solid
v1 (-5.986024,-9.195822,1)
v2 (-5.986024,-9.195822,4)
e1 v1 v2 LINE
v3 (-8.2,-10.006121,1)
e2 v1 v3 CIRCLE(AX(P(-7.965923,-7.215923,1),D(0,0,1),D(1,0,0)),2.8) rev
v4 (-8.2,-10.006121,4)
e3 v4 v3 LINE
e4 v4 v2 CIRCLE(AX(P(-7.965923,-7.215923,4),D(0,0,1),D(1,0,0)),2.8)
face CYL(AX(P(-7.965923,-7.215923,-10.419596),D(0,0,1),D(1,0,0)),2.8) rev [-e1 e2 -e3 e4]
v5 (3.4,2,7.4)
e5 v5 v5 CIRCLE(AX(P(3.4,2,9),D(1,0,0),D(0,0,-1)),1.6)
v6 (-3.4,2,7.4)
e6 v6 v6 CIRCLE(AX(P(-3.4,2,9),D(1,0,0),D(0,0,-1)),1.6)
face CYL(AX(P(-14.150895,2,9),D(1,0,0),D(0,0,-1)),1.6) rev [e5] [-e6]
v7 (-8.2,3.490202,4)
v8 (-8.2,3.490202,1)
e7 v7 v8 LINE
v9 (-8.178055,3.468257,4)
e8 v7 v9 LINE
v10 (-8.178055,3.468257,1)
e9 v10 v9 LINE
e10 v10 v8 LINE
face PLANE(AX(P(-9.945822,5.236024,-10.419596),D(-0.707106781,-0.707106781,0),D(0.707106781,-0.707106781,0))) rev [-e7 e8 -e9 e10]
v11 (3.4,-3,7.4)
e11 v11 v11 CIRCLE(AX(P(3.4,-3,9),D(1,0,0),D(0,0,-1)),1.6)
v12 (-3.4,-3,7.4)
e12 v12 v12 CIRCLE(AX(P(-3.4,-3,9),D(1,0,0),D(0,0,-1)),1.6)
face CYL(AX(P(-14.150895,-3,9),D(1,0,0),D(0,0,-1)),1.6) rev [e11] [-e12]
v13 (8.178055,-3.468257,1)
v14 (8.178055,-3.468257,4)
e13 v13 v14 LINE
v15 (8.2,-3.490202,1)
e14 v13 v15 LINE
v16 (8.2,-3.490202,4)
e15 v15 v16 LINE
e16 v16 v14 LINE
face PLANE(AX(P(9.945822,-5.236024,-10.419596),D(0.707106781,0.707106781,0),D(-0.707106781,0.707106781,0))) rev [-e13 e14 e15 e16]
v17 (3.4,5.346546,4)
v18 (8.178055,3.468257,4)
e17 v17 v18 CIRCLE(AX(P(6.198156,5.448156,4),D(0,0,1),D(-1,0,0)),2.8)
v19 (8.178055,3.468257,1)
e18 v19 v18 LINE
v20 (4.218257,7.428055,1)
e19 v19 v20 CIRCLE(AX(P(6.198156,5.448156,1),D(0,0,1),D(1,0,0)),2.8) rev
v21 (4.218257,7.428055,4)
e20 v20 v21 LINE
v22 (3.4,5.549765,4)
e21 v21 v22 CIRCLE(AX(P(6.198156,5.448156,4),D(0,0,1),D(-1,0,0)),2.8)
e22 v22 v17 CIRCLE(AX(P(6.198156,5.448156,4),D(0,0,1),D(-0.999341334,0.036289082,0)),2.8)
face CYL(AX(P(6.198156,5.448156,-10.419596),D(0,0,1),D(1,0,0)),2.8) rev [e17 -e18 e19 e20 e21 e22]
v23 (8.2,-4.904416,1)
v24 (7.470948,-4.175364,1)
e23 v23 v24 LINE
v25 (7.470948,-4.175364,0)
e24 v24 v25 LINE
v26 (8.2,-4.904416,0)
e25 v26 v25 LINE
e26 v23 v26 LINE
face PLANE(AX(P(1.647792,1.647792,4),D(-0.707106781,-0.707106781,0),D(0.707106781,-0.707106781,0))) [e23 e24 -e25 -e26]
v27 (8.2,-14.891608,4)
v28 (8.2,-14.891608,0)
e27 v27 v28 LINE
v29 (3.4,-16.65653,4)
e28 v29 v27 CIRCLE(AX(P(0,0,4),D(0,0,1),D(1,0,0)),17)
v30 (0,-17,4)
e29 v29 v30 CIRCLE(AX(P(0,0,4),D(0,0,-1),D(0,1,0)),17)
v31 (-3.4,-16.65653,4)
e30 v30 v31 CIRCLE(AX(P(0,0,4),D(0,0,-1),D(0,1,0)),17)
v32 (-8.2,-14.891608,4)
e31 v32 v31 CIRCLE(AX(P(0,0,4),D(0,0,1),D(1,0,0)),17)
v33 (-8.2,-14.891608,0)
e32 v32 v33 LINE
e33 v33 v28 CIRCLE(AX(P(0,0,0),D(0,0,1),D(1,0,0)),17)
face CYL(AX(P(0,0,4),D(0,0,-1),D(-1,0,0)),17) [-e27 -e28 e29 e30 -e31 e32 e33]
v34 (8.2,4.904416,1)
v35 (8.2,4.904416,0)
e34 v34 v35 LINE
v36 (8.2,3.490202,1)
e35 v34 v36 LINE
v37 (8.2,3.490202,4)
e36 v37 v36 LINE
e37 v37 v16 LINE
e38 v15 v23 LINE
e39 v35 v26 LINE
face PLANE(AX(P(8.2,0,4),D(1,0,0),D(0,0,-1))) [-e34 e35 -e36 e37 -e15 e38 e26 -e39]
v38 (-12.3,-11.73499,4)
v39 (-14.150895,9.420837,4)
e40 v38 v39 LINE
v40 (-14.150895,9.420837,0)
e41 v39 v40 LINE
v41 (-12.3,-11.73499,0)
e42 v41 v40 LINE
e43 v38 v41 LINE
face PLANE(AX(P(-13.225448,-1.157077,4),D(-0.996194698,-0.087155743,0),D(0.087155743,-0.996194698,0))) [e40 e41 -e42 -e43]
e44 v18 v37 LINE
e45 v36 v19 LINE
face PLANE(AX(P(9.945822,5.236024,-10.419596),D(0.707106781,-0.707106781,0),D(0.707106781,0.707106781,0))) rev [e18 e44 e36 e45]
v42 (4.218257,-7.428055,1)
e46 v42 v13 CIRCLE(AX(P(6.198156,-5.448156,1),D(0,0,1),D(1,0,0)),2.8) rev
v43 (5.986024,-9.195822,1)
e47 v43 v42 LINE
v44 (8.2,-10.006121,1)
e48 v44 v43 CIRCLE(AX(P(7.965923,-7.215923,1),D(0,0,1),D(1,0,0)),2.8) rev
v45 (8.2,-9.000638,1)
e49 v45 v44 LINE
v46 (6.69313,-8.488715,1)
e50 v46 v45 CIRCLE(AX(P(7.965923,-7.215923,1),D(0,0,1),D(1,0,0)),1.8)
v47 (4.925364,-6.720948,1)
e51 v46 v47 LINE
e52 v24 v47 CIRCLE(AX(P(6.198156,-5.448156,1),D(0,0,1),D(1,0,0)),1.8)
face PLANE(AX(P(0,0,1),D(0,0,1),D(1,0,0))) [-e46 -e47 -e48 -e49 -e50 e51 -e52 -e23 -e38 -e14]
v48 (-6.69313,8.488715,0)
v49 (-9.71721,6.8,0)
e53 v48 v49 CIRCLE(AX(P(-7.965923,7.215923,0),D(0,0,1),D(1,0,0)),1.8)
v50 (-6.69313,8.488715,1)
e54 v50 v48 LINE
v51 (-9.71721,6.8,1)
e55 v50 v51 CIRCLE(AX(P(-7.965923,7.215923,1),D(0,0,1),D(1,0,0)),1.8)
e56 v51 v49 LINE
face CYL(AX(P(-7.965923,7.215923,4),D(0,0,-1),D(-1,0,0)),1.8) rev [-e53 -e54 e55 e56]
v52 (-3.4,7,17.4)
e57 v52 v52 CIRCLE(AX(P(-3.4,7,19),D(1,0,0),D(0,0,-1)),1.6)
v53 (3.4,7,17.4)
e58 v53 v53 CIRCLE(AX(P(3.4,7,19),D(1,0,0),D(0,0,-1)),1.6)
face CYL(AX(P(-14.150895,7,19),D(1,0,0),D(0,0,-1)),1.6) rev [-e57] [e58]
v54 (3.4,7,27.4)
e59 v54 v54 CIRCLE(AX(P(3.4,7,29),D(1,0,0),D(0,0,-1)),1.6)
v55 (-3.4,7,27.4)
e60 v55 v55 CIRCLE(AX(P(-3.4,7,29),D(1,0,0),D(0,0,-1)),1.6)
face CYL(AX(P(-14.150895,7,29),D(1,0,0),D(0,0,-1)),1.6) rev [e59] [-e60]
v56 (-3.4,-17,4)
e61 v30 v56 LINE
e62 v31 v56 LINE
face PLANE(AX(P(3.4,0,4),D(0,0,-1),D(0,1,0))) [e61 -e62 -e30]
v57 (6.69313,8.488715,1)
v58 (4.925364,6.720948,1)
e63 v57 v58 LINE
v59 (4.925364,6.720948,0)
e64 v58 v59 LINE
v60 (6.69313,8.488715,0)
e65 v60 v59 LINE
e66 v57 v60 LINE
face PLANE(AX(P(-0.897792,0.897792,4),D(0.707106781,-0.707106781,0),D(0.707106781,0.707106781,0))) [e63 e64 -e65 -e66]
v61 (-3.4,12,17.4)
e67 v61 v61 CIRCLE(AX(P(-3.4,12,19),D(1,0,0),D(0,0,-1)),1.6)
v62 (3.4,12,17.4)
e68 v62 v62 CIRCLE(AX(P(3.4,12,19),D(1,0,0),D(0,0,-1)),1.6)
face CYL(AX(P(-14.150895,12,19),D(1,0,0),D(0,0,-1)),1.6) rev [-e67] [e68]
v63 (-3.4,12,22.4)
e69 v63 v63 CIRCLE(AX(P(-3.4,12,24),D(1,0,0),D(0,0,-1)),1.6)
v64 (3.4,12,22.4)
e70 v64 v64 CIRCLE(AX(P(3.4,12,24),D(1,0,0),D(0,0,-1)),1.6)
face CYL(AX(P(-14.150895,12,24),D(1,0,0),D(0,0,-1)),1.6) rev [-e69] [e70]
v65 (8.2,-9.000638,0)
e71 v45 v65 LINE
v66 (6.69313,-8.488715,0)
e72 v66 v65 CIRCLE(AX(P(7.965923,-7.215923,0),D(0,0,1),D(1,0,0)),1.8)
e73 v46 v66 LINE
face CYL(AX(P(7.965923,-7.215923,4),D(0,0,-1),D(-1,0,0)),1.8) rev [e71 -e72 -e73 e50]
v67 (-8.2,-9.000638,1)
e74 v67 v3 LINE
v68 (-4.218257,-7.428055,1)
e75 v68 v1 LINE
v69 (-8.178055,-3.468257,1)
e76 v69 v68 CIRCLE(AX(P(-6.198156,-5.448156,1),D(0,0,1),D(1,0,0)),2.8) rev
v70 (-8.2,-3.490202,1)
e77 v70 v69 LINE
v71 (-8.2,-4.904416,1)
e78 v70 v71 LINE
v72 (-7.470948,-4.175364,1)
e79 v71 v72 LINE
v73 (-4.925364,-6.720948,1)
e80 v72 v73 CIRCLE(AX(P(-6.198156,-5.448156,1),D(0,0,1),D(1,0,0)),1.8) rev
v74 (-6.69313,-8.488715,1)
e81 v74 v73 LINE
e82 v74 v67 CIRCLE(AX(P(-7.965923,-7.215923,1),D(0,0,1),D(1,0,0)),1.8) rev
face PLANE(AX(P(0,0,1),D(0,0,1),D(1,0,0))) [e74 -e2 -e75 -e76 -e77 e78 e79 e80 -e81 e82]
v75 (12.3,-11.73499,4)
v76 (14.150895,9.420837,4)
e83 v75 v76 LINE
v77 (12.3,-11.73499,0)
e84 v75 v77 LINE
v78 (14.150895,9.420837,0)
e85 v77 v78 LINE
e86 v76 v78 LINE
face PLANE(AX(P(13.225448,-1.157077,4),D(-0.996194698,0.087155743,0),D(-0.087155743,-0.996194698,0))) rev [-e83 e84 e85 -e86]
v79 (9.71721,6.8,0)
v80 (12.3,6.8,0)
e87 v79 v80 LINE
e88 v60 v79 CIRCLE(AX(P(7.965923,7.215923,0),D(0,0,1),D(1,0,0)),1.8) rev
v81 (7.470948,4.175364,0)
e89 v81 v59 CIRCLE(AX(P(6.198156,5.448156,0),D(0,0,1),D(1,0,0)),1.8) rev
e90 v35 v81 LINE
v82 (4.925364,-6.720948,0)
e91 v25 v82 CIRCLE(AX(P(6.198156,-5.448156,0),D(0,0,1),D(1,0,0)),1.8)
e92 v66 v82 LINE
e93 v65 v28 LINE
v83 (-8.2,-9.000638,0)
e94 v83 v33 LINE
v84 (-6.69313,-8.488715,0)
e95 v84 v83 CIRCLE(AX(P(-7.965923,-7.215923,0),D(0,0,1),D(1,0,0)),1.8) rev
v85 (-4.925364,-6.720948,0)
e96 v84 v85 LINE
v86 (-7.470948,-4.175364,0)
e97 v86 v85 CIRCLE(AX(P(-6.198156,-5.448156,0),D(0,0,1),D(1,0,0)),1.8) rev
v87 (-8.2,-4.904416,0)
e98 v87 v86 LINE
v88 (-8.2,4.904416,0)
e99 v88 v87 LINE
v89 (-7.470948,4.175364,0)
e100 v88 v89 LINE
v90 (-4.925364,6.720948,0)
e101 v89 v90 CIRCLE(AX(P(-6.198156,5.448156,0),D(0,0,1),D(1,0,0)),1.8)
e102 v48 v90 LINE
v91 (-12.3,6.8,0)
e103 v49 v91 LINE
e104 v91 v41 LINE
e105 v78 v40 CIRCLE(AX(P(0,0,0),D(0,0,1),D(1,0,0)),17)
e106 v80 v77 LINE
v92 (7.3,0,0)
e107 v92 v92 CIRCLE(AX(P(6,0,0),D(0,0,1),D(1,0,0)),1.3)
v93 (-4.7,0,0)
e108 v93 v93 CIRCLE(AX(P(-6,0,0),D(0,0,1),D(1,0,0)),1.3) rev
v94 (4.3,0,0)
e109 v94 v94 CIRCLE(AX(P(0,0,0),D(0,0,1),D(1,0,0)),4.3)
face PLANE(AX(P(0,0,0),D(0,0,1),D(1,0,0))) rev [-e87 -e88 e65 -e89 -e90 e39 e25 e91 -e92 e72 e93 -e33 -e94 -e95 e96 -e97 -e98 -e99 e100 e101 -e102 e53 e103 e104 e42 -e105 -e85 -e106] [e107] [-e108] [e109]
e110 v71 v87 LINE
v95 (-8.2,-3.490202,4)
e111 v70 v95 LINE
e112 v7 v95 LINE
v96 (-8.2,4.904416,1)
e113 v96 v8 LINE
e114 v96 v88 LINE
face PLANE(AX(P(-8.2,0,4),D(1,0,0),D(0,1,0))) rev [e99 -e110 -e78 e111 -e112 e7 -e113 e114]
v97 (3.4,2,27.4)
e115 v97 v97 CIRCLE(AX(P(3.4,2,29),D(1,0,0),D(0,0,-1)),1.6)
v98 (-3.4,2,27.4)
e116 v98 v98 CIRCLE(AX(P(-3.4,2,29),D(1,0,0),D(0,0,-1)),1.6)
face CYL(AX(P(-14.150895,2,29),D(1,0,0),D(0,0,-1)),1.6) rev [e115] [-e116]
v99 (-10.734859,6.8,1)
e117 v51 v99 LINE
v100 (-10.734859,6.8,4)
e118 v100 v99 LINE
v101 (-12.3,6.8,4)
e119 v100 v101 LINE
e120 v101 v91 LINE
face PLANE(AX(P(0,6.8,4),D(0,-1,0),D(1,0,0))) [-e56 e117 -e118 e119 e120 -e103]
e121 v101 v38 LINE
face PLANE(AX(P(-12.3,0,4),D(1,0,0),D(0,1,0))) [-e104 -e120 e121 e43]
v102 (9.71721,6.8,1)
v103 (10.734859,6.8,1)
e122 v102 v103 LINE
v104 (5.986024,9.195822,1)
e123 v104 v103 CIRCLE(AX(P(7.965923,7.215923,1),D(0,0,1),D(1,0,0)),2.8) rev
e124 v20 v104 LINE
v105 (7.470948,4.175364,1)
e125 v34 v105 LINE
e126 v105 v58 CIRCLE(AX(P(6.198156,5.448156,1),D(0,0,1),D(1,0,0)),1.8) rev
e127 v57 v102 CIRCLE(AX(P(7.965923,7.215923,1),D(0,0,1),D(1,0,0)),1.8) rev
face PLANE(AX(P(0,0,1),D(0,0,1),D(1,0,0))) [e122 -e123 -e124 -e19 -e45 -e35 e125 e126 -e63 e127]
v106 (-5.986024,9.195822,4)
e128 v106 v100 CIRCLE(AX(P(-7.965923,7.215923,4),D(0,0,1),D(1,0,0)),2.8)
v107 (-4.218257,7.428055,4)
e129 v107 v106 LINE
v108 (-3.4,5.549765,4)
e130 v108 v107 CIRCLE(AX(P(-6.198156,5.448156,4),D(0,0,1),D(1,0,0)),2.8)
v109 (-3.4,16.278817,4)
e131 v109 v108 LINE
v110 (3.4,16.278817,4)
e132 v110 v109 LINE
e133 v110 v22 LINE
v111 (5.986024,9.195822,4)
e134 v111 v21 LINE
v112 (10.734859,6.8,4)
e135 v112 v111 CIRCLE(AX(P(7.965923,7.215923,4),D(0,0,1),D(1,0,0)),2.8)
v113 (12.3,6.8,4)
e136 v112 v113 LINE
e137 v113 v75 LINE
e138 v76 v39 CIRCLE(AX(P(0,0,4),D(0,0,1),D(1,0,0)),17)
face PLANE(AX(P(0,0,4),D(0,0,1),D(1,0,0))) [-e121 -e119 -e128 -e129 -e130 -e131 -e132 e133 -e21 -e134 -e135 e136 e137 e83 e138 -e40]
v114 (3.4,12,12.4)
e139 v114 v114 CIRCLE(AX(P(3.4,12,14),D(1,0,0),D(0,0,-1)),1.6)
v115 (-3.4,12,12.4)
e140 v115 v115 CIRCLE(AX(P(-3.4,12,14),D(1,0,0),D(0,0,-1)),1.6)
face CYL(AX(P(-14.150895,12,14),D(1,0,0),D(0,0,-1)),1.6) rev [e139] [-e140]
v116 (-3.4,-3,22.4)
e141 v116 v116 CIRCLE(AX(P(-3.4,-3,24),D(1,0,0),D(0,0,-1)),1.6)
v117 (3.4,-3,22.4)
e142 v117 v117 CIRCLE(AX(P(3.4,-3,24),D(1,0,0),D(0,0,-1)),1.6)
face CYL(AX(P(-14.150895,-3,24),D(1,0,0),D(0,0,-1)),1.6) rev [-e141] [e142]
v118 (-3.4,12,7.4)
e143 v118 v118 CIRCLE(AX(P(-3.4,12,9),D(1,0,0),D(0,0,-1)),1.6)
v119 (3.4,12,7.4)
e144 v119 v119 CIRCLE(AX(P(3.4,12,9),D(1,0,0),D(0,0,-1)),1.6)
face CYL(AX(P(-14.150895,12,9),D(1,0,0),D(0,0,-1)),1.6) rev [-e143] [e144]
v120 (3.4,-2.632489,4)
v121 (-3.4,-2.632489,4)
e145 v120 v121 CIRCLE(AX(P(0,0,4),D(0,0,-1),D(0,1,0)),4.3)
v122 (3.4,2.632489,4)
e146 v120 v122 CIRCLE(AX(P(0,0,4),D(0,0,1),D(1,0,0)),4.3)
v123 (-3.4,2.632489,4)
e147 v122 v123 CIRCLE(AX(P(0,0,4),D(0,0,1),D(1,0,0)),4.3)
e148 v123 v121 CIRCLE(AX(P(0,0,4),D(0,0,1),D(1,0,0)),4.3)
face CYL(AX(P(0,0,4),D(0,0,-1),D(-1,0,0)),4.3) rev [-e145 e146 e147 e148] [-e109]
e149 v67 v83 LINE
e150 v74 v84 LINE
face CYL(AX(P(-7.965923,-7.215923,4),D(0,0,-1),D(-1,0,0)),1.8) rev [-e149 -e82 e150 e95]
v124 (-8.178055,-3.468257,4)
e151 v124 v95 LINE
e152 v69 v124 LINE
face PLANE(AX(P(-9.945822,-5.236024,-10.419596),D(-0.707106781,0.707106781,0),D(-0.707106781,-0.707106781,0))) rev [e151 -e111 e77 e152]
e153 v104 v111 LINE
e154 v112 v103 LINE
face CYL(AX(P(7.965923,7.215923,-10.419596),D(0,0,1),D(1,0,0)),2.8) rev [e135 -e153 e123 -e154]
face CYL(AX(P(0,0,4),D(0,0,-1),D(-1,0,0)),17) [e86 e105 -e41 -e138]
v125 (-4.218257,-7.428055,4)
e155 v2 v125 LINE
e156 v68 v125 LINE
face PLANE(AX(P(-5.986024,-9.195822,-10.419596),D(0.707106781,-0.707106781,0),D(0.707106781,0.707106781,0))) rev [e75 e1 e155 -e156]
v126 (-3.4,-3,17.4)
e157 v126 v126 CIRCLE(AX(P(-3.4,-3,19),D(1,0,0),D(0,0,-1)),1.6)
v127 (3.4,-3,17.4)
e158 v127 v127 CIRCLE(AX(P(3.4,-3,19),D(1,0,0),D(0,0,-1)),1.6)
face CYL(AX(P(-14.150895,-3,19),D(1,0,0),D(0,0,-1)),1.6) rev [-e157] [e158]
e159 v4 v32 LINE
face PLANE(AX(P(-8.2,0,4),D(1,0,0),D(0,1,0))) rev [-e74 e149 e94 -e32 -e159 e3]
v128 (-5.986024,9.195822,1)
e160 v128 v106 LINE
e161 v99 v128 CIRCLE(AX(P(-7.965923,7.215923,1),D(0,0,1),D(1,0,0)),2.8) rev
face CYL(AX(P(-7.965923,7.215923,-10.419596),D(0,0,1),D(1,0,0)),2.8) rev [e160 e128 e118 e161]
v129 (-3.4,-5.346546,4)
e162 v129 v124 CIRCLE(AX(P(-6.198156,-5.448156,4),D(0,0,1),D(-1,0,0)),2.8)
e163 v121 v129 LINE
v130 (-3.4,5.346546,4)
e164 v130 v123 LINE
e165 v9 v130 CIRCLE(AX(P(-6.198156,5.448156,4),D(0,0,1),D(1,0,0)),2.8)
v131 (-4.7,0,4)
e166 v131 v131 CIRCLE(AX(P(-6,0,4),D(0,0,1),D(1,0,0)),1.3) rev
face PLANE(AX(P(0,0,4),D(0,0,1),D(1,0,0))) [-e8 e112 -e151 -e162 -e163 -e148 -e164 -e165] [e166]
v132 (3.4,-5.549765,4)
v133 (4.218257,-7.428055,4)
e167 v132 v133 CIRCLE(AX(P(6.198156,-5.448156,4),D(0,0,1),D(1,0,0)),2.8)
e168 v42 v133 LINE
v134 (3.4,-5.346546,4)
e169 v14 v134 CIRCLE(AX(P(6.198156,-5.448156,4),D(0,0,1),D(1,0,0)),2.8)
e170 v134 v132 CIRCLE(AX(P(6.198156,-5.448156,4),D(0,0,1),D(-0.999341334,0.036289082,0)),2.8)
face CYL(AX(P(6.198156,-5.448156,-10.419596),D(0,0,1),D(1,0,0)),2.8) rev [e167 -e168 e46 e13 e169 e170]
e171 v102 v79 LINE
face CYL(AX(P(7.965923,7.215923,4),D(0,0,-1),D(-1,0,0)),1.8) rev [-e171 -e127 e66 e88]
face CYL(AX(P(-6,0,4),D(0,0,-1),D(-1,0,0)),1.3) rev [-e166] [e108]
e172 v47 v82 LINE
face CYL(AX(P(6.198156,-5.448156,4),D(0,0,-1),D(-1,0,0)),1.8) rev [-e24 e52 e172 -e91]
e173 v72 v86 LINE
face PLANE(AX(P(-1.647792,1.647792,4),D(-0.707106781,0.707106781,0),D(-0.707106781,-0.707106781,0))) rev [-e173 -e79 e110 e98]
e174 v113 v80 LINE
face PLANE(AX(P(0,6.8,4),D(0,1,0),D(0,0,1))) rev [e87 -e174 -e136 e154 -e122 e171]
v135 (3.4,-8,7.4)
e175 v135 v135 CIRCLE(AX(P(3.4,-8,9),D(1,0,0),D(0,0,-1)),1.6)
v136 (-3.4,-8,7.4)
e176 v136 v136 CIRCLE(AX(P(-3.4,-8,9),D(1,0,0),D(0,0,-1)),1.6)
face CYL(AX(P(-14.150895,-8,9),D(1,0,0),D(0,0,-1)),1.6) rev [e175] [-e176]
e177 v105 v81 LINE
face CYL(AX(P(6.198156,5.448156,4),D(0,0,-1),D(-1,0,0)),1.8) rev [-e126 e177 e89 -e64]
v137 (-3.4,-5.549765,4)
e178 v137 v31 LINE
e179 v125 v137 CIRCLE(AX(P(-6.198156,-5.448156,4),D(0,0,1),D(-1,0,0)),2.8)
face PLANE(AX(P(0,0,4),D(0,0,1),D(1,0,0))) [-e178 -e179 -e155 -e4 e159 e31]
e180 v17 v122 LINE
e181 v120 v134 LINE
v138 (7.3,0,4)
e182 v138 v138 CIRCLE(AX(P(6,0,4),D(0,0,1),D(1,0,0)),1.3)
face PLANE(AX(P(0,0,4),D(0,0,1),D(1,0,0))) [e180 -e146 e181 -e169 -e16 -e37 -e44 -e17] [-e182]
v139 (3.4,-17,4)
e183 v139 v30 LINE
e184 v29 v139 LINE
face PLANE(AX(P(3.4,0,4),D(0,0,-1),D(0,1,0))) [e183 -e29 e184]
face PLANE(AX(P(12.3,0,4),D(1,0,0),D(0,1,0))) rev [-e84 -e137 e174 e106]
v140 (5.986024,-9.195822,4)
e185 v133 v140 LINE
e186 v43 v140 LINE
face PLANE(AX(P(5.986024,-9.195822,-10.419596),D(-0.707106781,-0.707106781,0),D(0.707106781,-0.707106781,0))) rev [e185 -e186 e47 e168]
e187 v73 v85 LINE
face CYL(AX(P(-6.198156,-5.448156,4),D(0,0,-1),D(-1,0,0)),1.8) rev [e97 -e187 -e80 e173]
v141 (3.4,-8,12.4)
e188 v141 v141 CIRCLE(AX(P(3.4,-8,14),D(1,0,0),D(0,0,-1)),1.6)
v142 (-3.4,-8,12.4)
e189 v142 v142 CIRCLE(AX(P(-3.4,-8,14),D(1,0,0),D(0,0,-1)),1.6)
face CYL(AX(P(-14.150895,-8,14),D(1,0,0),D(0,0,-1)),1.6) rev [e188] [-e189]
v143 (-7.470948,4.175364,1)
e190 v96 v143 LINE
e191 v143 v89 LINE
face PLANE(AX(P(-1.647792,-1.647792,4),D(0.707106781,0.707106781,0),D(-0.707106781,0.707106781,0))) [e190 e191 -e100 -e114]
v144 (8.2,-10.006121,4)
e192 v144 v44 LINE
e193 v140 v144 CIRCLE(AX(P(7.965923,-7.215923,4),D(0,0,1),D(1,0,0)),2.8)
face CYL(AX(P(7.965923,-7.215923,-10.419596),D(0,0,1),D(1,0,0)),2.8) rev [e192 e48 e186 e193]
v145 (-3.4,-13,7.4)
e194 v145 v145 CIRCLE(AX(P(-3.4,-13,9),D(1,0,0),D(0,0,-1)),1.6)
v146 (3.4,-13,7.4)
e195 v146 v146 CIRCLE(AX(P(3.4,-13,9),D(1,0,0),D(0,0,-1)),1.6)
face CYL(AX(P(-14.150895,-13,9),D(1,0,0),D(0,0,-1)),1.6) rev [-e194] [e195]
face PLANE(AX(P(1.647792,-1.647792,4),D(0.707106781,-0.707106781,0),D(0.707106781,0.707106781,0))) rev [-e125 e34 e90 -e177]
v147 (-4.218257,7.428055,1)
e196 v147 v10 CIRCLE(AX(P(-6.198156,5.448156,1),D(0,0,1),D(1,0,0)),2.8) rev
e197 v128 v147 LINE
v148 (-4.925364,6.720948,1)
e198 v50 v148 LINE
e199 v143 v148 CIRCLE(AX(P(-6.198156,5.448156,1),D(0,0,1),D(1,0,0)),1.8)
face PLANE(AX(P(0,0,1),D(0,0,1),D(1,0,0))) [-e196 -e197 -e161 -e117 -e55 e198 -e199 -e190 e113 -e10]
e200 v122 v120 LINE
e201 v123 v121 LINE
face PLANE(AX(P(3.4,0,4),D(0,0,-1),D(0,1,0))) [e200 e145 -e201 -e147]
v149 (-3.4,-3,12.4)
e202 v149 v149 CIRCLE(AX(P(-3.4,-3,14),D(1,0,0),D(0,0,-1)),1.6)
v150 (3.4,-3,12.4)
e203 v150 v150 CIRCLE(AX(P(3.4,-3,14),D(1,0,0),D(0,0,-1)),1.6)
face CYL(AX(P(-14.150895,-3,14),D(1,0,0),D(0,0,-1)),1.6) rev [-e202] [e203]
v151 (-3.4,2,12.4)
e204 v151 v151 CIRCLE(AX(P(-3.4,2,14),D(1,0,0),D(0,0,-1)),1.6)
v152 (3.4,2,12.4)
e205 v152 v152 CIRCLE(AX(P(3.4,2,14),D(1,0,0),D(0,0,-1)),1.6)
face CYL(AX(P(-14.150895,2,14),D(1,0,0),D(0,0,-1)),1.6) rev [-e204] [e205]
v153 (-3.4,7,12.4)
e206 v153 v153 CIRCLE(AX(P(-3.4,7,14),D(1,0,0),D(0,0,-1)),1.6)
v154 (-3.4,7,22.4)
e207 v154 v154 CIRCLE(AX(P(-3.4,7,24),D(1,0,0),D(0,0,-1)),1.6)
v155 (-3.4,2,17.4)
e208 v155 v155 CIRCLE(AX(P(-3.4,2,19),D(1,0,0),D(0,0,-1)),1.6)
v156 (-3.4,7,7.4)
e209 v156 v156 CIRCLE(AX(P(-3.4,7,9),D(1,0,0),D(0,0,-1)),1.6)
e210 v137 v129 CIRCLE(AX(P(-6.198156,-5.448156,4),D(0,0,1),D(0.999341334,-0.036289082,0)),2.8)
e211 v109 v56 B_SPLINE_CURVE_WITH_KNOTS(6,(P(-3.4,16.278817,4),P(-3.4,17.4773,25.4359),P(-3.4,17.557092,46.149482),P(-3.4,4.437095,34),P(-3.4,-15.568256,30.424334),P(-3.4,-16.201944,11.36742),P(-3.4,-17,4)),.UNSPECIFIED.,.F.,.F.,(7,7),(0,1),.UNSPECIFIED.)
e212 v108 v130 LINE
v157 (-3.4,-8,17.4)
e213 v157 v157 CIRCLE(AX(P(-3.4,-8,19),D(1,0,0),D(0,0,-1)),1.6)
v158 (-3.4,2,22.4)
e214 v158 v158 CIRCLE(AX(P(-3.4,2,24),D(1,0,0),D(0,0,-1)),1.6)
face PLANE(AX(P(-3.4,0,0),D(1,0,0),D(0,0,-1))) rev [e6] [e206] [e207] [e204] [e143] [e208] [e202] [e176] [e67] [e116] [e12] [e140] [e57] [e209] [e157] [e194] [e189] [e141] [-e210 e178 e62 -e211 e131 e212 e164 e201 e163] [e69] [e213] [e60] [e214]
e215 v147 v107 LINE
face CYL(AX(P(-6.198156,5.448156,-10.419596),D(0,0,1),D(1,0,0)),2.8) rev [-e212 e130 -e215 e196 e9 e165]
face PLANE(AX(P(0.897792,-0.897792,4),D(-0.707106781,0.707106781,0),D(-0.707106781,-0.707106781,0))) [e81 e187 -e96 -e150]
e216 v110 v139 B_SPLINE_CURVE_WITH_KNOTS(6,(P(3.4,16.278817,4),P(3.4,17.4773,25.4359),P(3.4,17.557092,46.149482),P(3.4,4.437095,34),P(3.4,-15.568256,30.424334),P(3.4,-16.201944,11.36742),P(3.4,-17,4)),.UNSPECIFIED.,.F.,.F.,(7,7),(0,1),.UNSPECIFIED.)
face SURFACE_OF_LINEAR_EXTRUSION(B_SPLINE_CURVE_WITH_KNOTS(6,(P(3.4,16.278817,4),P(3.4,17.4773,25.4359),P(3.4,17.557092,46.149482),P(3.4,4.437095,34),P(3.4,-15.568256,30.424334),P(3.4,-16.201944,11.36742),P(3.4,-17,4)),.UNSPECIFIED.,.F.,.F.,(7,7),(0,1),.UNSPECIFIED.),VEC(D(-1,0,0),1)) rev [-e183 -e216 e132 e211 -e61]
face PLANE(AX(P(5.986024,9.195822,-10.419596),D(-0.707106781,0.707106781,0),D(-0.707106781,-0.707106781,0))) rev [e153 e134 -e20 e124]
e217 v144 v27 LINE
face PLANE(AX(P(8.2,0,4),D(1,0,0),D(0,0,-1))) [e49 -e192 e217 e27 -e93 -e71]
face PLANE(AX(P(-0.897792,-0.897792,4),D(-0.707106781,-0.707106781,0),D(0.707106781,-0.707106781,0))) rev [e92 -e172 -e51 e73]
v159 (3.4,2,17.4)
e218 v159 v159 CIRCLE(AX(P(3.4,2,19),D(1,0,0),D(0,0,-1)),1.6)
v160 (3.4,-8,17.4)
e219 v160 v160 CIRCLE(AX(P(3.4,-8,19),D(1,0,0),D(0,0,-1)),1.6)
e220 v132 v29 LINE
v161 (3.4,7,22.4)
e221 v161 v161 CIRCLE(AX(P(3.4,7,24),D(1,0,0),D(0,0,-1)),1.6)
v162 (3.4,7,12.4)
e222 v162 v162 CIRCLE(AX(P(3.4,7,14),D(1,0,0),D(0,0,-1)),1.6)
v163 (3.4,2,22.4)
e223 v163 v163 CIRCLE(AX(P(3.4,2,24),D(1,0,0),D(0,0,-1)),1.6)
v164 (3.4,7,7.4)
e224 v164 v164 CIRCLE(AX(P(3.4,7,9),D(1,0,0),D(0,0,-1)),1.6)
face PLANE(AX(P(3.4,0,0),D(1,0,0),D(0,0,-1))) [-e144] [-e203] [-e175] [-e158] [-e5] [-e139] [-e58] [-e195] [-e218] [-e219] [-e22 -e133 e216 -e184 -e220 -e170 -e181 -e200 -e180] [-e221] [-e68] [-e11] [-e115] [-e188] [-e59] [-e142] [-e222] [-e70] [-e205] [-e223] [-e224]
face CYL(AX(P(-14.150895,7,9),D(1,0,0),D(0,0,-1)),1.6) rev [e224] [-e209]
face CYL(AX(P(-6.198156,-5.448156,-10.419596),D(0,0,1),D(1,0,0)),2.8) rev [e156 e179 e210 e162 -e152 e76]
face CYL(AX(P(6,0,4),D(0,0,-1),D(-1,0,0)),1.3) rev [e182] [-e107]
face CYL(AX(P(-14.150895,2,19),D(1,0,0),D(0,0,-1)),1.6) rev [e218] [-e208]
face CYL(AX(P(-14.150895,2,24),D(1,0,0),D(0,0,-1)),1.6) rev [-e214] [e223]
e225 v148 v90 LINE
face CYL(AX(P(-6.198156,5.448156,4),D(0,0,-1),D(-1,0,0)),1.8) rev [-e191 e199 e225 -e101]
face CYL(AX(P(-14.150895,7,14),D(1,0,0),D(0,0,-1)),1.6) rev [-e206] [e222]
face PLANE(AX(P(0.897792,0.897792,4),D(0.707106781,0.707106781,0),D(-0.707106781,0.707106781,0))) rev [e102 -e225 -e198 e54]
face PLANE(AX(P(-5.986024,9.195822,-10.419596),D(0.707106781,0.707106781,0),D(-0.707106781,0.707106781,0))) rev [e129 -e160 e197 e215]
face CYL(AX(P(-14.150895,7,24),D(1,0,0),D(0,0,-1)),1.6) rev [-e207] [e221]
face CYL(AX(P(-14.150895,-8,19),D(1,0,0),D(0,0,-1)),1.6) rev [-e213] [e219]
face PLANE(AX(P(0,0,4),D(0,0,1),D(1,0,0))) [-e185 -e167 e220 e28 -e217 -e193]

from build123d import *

# Parameters (mm, degrees)
SKETCH_2_R          = 1.3
SKETCH_2_R_2        = 4.3
EXTRUDE_1_DEPTH     = 4
CUT_EXTRUDE_1_DEPTH = 3
EXTRUDE_START       = -3.4
EXTRUDE_2_DEPTH     = 6.8
CUT_EXTRUDE_START   = 3.4
SKETCH_12_R         = 1.6
CUT_EXTRUDE_2_DEPTH = 44.412015776


# Read off the part's stored shape, not the designer's step: 凸台-拉伸2
with BuildPart() as part:
    # 草图2 → 凸台-拉伸1 (new body)
    with BuildSketch(Plane.XY):
        with BuildLine():
            Line((-14.150895062, 9.420836955), (-12.3, -11.734990413))
            Line((-12.3, -11.734990413), (-12.3, 6.8))
            Line((-12.3, 6.8), (-9.717210306, 6.8))
            ThreePointArc((-9.717210306, 6.8), (-8.843521096, 8.787489117), (-6.693130483, 8.488714895))
            Line((-6.693130483, 8.488714895), (-4.92536353, 6.720947942))
            ThreePointArc((-4.92536353, 6.720947942), (-4.92536353, 4.17536353), (-7.470947942, 4.17536353))
            Line((-7.470947942, 4.17536353), (-8.2, 4.904415588))
            Line((-8.2, 4.904415588), (-8.2, -4.904415588))
            Line((-8.2, -4.904415588), (-7.470947942, -4.17536353))
            ThreePointArc((-7.470947942, -4.17536353), (-4.92536353, -4.17536353), (-4.92536353, -6.720947942))
            Line((-4.92536353, -6.720947942), (-6.693130483, -8.488714895))
            ThreePointArc((-6.693130483, -8.488714895), (-7.386916292, -8.92025587), (-8.2, -9.00063774))
            Line((-8.2, -9.00063774), (-8.2, -14.891608375))
            ThreePointArc((-8.2, -14.891608375), (0, -17), (8.2, -14.891608375))
            Line((8.2, -14.891608375), (8.2, -9.00063774))
            ThreePointArc((8.2, -9.00063774), (7.386916292, -8.92025587), (6.693130483, -8.488714895))
            Line((6.693130483, -8.488714895), (4.92536353, -6.720947942))
            ThreePointArc((4.92536353, -6.720947942), (4.92536353, -4.17536353), (7.470947942, -4.17536353))
            Line((7.470947942, -4.17536353), (8.2, -4.904415588))
            Line((8.2, -4.904415588), (8.2, 4.904415588))
            Line((8.2, 4.904415588), (7.470947942, 4.17536353))
            ThreePointArc((7.470947942, 4.17536353), (4.92536353, 4.17536353), (4.92536353, 6.720947942))
            Line((4.92536353, 6.720947942), (6.693130483, 8.488714895))
            ThreePointArc((6.693130483, 8.488714895), (8.843521096, 8.787489117), (9.717210306, 6.8))
            Line((9.717210306, 6.8), (12.3, 6.8))
            Line((12.3, 6.8), (12.3, -11.734990413))
            Line((12.3, -11.734990413), (14.150895062, 9.420836955))
            ThreePointArc((14.150895062, 9.420836955), (0, 17), (-14.150895062, 9.420836955))
        make_face()
        with Locations((-6, 0)):
            Circle(SKETCH_2_R, mode=Mode.SUBTRACT)
        Circle(SKETCH_2_R_2, mode=Mode.SUBTRACT)
        with Locations((6, 0)):
            Circle(SKETCH_2_R, mode=Mode.SUBTRACT)
    extrude(amount=EXTRUDE_1_DEPTH)

    # 草图10 → 切除-拉伸1 (cut)
    with BuildSketch(Plane.XY.offset(4)):
        with BuildLine():
            Line((-5.986023702, 9.195821676), (-4.218256749, 7.428054723))
            ThreePointArc((-4.218256749, 7.428054723), (-4.218256749, 3.468256749), (-8.178054723, 3.468256749))
            Line((-8.178054723, 3.468256749), (-9.945821676, 5.236023702))
            ThreePointArc((-9.945821676, 5.236023702), (-9.945821676, 9.195821676), (-5.986023702, 9.195821676))
        make_face()
        with BuildLine():
            Line((-5.986023702, -9.195821676), (-4.218256749, -7.428054723))
            ThreePointArc((-4.218256749, -7.428054723), (-4.218256749, -3.468256749), (-8.178054723, -3.468256749))
            Line((-8.178054723, -3.468256749), (-9.945821676, -5.236023702))
            ThreePointArc((-9.945821676, -5.236023702), (-9.945821676, -9.195821676), (-5.986023702, -9.195821676))
        make_face()
        with BuildLine():
            Line((5.986023702, 9.195821676), (4.218256749, 7.428054723))
            ThreePointArc((4.218256749, 7.428054723), (4.218256749, 3.468256749), (8.178054723, 3.468256749))
            Line((8.178054723, 3.468256749), (9.945821676, 5.236023702))
            ThreePointArc((9.945821676, 5.236023702), (9.945821676, 9.195821676), (5.986023702, 9.195821676))
        make_face()
        with BuildLine():
            Line((5.986023702, -9.195821676), (4.218256749, -7.428054723))
            ThreePointArc((4.218256749, -7.428054723), (4.218256749, -3.468256749), (8.178054723, -3.468256749))
            Line((8.178054723, -3.468256749), (9.945821676, -5.236023702))
            ThreePointArc((9.945821676, -5.236023702), (9.945821676, -9.195821676), (5.986023702, -9.195821676))
        make_face()
    extrude(amount=-CUT_EXTRUDE_1_DEPTH, mode=Mode.SUBTRACT)

    # 凸台-拉伸2 outline → 凸台-拉伸2 (add)
    with BuildSketch(Plane(origin=(0, 0, 0), x_dir=(0, 0, -1), z_dir=(1, 0, 0)).offset(EXTRUDE_START)):
        with BuildLine():
            Line((-4, -17), (-4, 16.2788168))
            add(Edge.make_bspline(
                [(-4, 16.2788168), (-25.43589952, 17.477300344), (-46.149481519, 17.5570925), (-34, 4.437094901), (-30.42433351, -15.568255951), (-11.367420307, -16.201944254), (-4, -17)],
                knots=[0, 0, 0, 0, 0, 0, 0, 1, 1, 1, 1, 1, 1, 1], degree=6))
        make_face()
    extrude(amount=EXTRUDE_2_DEPTH)

    # 草图12 → 切除-拉伸2 (cut, through all)
    with BuildSketch(Plane(origin=(0, 0, 0), x_dir=(0, 0, -1), z_dir=(1, 0, 0)).offset(CUT_EXTRUDE_START)):
        with Locations((-9, 12)):
            Circle(SKETCH_12_R)
        with Locations((-9, -13)):
            Circle(SKETCH_12_R)
        with Locations((-9, 7)):
            Circle(SKETCH_12_R)
        with Locations((-9, -8)):
            Circle(SKETCH_12_R)
        with Locations((-9, 2)):
            Circle(SKETCH_12_R)
        with Locations((-9, -3)):
            Circle(SKETCH_12_R)
        with Locations((-29, 7)):
            Circle(SKETCH_12_R)
        with Locations((-29, 2)):
            Circle(SKETCH_12_R)
        with Locations((-24, 12)):
            Circle(SKETCH_12_R)
        with Locations((-19, 12)):
            Circle(SKETCH_12_R)
        with Locations((-14, 12)):
            Circle(SKETCH_12_R)
        with Locations((-24, 7)):
            Circle(SKETCH_12_R)
        with Locations((-19, 7)):
            Circle(SKETCH_12_R)
        with Locations((-14, 7)):
            Circle(SKETCH_12_R)
        with Locations((-24, 2)):
            Circle(SKETCH_12_R)
        with Locations((-19, 2)):
            Circle(SKETCH_12_R)
        with Locations((-14, 2)):
            Circle(SKETCH_12_R)
        with Locations((-24, -3)):
            Circle(SKETCH_12_R)
        with Locations((-19, -3)):
            Circle(SKETCH_12_R)
        with Locations((-14, -3)):
            Circle(SKETCH_12_R)
        with Locations((-19, -8)):
            Circle(SKETCH_12_R)
        with Locations((-14, -8)):
            Circle(SKETCH_12_R)
    extrude(amount=-CUT_EXTRUDE_2_DEPTH, mode=Mode.SUBTRACT)


solid = part.part
